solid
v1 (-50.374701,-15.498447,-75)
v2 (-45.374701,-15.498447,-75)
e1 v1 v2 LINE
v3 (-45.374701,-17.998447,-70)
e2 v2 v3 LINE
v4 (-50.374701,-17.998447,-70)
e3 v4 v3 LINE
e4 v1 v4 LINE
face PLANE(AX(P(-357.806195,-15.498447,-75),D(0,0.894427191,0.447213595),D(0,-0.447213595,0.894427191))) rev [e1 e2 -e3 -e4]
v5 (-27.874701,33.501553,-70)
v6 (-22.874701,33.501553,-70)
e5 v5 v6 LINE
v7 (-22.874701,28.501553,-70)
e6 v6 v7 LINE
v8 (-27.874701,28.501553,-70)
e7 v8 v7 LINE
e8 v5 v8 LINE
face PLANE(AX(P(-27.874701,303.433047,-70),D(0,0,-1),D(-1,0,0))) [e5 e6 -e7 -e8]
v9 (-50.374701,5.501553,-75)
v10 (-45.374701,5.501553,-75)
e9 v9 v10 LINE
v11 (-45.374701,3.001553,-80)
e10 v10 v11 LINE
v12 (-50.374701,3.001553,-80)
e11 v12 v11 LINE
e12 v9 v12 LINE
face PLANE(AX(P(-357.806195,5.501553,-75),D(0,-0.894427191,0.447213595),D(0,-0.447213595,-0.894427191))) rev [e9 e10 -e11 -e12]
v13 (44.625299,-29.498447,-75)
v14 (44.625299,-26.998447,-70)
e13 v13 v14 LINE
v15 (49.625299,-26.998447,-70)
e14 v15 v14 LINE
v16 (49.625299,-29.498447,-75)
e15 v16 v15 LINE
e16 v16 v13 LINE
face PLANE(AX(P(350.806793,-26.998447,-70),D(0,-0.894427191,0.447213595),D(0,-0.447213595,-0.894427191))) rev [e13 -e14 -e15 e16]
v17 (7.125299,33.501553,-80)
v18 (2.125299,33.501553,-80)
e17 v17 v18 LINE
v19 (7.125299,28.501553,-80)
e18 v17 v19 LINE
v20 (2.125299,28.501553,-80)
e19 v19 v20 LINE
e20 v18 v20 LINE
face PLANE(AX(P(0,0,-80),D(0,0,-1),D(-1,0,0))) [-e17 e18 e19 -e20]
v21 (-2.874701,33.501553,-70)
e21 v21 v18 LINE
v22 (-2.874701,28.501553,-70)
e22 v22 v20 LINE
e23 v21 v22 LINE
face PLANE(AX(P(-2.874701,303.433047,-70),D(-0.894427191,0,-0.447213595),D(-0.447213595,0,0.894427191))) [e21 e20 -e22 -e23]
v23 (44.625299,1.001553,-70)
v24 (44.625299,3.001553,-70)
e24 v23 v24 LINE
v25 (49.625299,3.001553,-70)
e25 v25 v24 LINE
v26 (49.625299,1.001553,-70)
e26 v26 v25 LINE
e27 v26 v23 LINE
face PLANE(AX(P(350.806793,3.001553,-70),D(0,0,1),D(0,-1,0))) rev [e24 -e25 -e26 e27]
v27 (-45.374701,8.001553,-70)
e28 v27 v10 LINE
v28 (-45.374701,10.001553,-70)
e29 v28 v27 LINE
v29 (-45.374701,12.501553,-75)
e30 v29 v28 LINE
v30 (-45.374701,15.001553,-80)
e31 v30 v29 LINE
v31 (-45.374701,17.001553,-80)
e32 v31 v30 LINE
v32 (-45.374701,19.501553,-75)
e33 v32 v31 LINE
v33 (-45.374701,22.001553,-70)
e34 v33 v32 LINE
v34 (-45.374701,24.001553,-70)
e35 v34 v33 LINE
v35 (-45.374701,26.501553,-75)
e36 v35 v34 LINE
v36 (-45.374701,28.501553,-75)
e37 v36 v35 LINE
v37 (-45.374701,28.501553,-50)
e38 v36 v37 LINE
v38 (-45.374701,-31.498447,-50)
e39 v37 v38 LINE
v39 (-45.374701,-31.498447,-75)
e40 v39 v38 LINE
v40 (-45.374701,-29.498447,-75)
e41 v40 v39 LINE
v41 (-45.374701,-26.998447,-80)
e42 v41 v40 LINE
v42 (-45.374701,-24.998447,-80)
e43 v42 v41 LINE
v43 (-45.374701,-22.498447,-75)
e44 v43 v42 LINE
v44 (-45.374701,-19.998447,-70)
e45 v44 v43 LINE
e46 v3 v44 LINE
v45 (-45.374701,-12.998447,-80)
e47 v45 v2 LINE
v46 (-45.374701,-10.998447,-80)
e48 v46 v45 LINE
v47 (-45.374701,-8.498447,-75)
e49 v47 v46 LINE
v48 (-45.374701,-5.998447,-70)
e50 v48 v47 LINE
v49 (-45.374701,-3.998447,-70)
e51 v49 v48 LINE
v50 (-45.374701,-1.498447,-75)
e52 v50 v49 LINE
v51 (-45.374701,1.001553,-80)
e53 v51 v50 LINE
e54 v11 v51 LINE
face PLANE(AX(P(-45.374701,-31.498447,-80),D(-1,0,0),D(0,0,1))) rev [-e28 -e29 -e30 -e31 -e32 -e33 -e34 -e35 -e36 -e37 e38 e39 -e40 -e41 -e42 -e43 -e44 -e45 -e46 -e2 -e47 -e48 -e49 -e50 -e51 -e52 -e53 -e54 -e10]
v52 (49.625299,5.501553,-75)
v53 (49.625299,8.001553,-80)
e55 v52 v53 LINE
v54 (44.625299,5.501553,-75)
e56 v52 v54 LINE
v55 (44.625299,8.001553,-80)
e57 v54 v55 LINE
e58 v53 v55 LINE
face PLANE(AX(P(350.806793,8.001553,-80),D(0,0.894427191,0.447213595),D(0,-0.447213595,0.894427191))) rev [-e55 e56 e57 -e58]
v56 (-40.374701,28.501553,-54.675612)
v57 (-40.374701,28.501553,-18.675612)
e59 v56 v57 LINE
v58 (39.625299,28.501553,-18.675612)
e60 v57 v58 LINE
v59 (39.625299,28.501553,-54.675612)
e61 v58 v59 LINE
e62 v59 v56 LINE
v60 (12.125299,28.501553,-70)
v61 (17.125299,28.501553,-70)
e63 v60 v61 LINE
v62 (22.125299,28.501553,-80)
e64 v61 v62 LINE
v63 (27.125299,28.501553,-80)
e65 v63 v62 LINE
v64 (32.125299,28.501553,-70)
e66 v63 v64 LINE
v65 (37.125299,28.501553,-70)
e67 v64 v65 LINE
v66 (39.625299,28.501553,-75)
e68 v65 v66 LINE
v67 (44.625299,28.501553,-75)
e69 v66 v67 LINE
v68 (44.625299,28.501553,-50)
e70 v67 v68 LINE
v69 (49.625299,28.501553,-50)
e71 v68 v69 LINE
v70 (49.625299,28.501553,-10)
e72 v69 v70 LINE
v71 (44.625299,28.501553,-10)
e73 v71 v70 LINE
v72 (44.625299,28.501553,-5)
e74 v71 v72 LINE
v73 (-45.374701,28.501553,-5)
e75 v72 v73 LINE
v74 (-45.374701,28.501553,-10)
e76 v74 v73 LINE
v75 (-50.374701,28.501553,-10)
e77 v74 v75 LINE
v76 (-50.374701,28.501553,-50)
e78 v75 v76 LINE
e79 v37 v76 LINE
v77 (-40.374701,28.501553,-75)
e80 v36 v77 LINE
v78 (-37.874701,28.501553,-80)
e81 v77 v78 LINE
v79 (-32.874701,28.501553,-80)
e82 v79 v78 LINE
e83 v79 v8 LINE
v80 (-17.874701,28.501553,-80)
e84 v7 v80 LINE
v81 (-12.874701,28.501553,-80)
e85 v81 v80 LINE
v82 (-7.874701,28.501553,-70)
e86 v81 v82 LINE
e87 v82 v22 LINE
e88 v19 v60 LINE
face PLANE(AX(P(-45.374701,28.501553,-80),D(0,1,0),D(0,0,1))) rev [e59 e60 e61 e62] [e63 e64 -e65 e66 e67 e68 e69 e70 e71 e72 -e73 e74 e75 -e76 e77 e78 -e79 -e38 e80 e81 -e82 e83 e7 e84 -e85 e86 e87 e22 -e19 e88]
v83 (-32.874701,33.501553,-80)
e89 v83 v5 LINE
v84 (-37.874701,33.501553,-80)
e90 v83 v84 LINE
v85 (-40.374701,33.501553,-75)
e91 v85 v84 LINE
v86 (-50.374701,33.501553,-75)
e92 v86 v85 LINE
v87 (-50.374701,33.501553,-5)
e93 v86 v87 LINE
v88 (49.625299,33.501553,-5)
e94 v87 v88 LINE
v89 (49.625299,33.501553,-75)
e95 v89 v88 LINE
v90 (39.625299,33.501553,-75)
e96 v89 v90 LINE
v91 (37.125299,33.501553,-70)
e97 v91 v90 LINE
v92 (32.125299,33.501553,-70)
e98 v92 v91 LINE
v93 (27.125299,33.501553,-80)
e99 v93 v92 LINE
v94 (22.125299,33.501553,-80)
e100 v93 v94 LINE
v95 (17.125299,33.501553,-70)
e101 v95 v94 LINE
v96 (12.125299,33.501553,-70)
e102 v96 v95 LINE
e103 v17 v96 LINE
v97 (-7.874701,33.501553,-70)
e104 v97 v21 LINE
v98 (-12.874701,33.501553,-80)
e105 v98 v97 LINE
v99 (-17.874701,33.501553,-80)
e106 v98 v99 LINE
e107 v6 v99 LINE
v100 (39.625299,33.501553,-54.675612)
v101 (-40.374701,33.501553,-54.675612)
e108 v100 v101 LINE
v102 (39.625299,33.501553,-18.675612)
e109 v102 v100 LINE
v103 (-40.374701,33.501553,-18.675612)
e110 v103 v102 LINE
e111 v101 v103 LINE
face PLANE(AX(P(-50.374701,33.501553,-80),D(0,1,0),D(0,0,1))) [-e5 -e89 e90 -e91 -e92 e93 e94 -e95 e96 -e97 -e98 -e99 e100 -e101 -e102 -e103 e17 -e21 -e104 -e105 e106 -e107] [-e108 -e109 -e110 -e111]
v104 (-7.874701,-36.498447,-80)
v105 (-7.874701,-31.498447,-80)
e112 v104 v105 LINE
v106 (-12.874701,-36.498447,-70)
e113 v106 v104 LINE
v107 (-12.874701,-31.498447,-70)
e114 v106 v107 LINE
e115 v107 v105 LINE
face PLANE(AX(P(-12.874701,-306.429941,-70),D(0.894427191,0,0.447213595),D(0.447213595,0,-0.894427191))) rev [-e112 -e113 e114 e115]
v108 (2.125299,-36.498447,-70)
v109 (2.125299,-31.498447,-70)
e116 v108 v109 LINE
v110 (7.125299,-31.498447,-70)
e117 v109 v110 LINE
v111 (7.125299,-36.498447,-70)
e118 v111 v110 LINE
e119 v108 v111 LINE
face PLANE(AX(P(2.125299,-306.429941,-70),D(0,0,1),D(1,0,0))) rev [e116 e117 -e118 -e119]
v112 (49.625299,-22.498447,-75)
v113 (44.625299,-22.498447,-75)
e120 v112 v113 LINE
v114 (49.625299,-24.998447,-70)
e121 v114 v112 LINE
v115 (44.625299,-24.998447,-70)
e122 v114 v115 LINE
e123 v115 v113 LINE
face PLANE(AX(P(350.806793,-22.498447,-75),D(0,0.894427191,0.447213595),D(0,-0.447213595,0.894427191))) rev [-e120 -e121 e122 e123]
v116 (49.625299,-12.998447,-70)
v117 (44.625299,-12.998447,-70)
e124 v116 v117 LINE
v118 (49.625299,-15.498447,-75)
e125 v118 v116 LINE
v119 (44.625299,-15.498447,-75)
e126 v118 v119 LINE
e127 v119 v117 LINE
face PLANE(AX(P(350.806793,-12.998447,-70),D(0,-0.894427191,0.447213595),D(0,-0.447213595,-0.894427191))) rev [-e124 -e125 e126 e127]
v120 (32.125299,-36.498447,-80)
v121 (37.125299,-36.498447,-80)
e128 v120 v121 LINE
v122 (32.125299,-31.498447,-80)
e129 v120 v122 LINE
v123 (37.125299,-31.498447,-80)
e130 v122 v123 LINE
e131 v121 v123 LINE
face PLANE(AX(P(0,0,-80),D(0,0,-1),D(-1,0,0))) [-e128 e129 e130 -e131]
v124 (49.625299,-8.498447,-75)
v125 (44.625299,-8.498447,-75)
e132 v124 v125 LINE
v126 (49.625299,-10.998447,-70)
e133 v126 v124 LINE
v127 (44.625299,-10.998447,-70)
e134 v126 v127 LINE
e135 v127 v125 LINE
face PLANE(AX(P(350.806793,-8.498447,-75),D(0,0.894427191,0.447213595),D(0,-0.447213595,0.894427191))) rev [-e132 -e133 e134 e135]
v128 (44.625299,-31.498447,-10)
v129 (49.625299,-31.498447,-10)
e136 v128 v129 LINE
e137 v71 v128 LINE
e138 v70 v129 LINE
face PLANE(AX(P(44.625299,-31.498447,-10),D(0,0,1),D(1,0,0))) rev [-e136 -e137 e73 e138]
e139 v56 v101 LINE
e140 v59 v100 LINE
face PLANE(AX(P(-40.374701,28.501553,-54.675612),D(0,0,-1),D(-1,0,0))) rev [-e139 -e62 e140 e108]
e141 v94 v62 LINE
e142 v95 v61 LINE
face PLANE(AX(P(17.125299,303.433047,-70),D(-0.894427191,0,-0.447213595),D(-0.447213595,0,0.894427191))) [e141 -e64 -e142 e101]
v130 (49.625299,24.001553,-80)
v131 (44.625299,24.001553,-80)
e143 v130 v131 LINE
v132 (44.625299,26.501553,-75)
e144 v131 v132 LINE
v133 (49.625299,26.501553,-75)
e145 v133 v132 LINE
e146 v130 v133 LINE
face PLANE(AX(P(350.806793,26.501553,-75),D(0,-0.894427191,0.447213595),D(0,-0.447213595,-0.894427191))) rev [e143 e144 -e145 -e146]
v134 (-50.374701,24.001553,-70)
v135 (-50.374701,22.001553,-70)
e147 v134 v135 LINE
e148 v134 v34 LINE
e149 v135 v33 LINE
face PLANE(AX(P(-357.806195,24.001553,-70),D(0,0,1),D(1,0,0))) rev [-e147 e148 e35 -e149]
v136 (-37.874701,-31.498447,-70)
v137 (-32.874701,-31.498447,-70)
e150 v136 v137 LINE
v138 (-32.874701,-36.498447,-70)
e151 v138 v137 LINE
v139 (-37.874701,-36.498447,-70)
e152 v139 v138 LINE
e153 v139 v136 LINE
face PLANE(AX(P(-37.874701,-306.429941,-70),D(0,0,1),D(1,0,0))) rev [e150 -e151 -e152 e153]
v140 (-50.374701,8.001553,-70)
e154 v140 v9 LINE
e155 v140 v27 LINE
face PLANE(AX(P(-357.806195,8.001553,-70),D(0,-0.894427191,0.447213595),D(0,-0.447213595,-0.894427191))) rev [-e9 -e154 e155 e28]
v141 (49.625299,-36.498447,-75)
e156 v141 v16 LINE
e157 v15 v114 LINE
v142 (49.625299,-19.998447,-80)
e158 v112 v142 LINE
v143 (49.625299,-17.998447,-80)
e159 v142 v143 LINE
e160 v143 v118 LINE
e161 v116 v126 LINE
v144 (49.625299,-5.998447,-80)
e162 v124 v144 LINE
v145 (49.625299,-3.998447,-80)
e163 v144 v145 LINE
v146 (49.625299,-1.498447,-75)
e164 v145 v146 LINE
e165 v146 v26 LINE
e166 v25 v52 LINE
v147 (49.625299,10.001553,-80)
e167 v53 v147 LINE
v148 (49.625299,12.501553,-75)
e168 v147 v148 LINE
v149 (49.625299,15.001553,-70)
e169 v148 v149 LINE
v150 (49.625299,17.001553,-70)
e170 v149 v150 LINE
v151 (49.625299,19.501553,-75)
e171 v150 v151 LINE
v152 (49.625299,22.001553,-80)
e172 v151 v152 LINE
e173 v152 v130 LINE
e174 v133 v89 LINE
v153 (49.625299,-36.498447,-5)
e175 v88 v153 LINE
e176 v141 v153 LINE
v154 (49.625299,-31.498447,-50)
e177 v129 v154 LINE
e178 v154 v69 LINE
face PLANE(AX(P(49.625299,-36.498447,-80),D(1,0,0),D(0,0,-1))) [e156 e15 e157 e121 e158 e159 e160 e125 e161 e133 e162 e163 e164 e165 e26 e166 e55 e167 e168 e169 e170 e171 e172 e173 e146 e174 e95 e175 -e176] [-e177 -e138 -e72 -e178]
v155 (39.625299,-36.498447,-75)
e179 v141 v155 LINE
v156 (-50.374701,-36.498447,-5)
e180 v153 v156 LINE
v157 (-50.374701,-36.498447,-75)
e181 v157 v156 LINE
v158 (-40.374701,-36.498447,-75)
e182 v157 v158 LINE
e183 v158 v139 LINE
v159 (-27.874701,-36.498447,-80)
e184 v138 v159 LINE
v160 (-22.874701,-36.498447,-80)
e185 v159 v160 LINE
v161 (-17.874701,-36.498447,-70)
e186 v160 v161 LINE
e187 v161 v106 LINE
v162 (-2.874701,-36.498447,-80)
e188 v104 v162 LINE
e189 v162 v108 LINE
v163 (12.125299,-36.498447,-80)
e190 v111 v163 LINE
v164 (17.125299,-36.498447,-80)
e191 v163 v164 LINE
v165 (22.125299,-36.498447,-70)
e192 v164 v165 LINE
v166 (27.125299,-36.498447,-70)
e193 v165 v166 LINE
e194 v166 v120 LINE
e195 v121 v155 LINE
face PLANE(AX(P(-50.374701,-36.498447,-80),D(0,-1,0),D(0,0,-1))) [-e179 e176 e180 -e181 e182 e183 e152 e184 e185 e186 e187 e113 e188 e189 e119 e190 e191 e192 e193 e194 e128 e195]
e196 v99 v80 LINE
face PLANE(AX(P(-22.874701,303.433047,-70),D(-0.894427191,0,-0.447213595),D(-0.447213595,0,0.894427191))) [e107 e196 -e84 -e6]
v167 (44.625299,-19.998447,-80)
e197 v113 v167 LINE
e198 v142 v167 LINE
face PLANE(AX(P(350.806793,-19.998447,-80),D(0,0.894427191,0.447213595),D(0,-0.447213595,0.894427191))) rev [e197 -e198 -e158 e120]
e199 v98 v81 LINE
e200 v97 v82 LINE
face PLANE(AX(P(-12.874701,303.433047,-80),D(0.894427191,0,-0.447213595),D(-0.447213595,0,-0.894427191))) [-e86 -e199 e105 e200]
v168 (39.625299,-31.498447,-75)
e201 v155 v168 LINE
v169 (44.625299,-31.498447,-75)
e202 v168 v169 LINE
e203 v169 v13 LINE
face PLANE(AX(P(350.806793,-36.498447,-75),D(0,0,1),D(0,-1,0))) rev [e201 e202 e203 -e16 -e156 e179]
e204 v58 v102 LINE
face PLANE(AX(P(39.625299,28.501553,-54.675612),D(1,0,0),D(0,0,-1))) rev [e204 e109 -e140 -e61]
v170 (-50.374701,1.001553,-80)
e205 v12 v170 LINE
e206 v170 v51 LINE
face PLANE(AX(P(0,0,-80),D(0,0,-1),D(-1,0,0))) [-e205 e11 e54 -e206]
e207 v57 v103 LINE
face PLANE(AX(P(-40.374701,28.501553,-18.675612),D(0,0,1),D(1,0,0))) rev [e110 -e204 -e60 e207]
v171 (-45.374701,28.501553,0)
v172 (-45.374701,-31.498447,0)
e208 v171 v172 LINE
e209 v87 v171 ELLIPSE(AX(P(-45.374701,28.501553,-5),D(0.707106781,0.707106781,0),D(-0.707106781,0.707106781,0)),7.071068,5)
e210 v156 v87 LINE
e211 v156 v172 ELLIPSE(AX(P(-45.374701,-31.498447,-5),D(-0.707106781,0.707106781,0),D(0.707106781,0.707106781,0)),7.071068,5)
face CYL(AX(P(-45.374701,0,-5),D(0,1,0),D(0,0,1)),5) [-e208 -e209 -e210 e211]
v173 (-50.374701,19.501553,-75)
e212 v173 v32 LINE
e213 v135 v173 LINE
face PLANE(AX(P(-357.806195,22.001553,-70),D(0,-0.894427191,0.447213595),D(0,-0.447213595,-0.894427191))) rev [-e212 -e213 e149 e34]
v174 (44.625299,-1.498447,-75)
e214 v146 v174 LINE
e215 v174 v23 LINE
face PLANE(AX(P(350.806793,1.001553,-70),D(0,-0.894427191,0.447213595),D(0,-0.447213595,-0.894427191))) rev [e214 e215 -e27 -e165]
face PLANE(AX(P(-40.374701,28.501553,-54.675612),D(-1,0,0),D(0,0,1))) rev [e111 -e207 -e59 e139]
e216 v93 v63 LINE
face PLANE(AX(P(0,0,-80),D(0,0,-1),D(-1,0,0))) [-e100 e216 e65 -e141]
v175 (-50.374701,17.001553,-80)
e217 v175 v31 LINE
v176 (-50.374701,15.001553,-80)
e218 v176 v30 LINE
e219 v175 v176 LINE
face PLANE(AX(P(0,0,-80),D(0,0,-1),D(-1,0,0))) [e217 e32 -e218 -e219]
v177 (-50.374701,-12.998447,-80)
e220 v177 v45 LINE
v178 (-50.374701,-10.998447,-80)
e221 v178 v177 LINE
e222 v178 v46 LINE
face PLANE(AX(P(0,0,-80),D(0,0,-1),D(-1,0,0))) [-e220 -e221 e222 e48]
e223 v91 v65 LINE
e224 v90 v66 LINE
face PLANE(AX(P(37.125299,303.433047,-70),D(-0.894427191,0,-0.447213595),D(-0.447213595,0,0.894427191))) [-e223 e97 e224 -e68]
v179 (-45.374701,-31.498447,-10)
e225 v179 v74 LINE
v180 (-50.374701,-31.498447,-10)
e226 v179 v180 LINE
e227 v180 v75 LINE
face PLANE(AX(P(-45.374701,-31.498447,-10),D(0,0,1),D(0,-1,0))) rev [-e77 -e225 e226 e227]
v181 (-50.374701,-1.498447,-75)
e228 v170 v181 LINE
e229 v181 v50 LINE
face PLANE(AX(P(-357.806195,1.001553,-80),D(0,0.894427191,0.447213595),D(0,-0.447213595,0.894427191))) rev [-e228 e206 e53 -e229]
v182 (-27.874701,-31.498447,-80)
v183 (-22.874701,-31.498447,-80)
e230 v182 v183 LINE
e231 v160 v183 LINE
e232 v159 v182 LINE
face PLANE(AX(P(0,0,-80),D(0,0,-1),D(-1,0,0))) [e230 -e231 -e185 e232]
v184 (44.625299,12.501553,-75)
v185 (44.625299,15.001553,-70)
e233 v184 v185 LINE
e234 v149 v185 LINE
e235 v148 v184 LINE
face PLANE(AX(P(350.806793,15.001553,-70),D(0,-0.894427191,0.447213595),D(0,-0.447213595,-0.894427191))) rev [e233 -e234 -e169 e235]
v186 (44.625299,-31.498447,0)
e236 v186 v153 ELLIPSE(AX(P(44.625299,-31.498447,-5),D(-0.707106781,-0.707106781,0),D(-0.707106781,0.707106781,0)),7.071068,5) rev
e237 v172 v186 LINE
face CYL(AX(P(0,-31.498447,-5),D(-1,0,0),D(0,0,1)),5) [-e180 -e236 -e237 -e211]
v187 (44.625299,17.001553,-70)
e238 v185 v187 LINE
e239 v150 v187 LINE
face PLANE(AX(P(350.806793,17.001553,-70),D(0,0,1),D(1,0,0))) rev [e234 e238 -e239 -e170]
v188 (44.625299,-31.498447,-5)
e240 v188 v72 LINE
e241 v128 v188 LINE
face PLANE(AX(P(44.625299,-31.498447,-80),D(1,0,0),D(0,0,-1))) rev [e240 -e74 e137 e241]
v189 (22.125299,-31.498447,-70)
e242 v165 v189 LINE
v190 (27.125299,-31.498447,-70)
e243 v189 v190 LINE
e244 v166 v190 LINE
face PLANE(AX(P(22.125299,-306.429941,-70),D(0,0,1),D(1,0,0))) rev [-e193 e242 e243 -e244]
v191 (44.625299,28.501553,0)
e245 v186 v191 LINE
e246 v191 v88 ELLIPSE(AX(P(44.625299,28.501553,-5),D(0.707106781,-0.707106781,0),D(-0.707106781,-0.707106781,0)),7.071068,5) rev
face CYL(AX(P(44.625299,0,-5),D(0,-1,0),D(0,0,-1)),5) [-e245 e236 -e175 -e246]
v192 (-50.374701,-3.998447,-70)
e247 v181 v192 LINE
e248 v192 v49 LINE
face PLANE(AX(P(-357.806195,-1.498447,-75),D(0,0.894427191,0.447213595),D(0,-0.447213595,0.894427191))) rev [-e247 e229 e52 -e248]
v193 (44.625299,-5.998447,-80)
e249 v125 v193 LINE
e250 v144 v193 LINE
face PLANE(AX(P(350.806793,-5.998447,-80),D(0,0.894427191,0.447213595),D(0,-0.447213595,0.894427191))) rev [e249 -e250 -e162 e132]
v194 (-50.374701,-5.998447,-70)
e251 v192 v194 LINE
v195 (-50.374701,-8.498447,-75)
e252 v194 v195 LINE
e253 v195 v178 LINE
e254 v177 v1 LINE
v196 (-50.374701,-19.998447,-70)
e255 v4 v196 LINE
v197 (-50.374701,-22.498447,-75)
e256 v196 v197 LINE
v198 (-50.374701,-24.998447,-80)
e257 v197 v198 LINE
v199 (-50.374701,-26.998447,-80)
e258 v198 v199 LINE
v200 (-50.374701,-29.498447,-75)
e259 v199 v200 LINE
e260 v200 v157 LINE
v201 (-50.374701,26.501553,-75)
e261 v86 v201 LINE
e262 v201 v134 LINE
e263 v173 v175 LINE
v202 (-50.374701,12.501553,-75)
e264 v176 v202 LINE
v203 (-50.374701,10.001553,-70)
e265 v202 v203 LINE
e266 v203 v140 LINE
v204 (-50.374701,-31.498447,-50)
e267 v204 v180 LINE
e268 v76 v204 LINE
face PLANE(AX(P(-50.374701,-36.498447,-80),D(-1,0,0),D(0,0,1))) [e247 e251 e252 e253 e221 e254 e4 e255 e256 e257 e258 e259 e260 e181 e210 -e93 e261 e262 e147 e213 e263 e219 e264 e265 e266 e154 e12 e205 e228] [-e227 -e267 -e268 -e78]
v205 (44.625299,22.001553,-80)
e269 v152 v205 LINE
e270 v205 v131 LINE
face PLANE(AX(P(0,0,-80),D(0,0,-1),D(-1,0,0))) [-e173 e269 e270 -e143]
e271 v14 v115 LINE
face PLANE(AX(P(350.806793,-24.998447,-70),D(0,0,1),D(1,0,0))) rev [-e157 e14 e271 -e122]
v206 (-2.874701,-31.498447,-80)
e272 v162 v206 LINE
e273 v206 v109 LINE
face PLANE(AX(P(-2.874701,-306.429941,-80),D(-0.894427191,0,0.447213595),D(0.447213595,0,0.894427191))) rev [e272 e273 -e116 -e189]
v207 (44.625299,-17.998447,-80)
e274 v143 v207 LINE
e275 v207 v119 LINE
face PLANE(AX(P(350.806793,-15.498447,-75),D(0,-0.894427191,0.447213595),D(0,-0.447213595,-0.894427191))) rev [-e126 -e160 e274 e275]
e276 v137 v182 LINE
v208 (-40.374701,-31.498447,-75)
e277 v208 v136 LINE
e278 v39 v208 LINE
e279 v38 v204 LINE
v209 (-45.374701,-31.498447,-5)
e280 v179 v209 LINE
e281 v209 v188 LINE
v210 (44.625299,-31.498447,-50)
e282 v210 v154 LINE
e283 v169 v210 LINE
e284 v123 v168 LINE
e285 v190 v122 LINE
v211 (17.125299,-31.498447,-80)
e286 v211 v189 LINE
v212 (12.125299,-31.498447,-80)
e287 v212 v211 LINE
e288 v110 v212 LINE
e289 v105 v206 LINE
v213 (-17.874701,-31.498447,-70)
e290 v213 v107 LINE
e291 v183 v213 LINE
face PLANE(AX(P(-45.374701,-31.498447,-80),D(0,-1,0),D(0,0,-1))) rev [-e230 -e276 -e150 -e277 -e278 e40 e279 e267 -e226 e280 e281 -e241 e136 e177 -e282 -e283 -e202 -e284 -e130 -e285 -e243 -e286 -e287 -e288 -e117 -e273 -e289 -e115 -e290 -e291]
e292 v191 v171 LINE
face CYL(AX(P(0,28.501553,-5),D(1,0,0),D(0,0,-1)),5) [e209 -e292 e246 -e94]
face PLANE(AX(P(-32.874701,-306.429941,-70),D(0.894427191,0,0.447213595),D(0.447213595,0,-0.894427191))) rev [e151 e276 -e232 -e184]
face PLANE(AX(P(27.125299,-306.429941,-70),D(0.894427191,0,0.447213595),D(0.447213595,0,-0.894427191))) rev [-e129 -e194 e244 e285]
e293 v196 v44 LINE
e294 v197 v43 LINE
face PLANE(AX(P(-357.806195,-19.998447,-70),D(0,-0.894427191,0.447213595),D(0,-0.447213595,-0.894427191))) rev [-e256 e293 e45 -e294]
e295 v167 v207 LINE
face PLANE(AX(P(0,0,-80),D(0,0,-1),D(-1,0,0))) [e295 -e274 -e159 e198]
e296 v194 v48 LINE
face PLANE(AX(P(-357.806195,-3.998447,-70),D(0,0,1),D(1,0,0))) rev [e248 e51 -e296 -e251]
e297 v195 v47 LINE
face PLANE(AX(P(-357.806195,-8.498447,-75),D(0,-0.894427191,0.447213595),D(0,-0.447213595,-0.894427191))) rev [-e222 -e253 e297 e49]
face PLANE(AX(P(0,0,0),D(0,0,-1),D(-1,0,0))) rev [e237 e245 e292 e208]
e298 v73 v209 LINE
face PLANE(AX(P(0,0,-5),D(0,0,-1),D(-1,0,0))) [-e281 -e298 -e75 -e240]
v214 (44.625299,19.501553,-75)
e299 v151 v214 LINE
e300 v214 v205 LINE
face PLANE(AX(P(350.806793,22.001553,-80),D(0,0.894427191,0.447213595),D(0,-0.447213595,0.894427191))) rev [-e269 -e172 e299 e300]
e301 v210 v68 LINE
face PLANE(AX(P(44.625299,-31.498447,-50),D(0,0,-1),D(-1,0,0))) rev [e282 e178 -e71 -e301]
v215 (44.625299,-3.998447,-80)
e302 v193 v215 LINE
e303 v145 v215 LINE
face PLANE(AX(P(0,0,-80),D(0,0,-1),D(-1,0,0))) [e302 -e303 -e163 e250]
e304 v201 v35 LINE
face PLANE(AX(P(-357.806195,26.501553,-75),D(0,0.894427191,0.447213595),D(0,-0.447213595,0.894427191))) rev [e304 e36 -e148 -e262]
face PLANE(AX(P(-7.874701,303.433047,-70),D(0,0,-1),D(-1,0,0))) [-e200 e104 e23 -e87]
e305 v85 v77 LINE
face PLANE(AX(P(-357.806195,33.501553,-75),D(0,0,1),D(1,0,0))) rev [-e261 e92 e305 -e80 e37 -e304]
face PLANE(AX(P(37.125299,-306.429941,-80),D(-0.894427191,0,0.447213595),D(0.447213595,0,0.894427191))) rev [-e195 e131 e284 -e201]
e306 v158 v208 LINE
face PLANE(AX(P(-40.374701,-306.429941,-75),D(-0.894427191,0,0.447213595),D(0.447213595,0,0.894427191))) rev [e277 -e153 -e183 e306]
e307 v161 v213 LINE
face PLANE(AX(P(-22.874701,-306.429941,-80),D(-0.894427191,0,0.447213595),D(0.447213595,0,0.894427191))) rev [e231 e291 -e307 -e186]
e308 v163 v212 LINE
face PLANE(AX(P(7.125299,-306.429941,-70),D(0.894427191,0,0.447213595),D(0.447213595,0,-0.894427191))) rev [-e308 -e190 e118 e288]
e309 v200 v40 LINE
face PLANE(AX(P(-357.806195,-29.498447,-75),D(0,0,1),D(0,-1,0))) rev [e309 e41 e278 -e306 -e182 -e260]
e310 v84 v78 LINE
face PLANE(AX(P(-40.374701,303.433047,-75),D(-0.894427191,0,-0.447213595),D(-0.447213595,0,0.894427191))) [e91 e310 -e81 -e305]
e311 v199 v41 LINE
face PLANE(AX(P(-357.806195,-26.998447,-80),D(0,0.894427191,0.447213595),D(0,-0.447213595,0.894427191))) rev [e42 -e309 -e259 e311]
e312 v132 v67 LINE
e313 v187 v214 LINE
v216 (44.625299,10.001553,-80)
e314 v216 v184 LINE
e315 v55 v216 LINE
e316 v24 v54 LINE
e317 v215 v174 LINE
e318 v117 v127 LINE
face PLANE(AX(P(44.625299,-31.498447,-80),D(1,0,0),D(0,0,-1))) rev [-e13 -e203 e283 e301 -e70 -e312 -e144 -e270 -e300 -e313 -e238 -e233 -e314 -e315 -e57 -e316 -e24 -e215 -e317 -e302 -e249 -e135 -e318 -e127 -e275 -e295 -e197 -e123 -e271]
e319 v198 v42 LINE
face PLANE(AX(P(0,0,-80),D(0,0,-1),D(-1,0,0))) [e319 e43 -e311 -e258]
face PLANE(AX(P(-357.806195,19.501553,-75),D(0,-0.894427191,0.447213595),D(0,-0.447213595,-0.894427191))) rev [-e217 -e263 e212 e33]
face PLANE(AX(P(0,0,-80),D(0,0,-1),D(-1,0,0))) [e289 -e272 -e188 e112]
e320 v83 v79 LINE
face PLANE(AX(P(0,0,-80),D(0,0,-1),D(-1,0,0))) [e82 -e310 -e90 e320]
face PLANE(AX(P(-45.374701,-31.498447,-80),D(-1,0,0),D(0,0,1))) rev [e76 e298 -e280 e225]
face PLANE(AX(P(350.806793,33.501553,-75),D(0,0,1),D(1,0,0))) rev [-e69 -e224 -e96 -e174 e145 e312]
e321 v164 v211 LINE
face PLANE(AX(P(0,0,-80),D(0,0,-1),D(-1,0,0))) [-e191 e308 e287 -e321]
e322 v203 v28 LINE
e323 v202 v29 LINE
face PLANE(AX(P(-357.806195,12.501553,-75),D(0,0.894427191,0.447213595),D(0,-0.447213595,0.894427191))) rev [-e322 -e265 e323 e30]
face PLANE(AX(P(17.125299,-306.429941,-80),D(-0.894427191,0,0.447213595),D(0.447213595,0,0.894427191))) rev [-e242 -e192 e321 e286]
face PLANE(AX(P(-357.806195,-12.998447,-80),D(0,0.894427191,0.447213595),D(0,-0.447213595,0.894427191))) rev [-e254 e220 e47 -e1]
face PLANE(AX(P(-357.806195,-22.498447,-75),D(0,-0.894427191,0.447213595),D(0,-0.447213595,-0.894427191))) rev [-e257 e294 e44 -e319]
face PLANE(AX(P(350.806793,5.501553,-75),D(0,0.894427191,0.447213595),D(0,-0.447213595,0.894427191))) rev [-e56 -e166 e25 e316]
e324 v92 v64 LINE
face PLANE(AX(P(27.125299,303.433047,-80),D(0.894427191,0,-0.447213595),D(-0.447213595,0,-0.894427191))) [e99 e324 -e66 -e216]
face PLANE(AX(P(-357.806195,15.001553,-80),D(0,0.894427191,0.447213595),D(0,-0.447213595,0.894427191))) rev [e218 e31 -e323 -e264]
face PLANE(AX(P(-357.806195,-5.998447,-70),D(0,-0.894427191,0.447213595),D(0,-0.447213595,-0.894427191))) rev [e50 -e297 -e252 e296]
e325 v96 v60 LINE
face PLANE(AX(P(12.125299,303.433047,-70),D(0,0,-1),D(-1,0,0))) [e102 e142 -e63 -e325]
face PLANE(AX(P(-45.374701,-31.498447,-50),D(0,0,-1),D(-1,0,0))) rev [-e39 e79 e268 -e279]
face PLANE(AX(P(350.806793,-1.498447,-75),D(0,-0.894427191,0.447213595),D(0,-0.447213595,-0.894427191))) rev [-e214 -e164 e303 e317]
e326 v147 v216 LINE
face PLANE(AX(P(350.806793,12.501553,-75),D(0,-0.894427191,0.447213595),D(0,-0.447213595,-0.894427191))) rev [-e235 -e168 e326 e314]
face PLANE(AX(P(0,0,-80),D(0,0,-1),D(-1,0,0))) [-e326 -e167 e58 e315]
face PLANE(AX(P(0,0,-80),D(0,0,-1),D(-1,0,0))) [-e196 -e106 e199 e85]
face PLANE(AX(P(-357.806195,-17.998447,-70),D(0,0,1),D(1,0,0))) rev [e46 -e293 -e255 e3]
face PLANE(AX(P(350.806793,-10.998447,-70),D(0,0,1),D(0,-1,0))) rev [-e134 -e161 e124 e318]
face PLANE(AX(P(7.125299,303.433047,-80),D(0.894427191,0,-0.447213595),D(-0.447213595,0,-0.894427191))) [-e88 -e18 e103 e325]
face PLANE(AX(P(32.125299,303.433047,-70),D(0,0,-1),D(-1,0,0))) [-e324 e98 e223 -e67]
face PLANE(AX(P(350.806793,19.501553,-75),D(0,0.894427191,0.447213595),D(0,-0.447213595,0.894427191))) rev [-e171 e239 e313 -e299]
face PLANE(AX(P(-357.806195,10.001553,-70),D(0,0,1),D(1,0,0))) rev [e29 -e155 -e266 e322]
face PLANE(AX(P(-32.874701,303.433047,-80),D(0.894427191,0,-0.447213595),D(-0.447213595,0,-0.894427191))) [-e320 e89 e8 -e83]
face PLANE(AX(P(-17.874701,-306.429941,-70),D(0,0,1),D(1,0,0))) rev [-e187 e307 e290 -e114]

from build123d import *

# Parameters (mm, degrees)
SKETCH1_W               = 100
SKETCH1_H               = 70
BOSS_EXTRUDE1_DEPTH     = 80
FILLET2_R               = 5
CUT_EXTRUDE1_START      = -5
SKETCH3_W               = 90
SKETCH3_H               = 60
CUT_EXTRUDE1_DEPTH      = 75
SKETCH2_W               = 40
SKETCH2_H               = 60
CUT_EXTRUDE2_DEPTH      = 5
SKETCH4_W               = 40
SKETCH4_H               = 60
CUT_EXTRUDE3_DEPTH      = 5
CUT_EXTRUDE4_START      = -5
CUT_EXTRUDE4_DEPTH      = 5
CUT_EXTRUDE5_START      = -5
CUT_EXTRUDE5_DEPTH      = 5
CUT_EXTRUDE6_DEPTH      = 118.633373344
CUT_EXTRUDE6_DEPTH_BACK = 5
CUT_EXTRUDE7_DEPTH      = 118.633373344
CUT_EXTRUDE7_DEPTH_BACK = 5
SKETCH9_W               = 80
SKETCH9_H               = 36
CUT_EXTRUDE8_DEPTH      = 5


# Read off the part's stored shape, not the designer's step: Cut-Extrude4, Cut-Extrude5
with BuildPart() as part:
    # Sketch1 → Boss-Extrude1 (new body)
    with BuildSketch(Plane.XY):
        with Locations((-0.374701232, -1.49844749)):
            Rectangle(SKETCH1_W, SKETCH1_H)
    extrude(amount=-BOSS_EXTRUDE1_DEPTH)

    # Fillet2
    fillet2_edges = [part.edges().sort_by_distance(p)[0] for p in [
        (-0.374701232, 33.50155251, 0),
        (49.625298768, -1.49844749, 0),
        (-0.374701232, -36.49844749, 0),
        (-50.374701232, -1.49844749, 0),
    ]]
    fillet(fillet2_edges, radius=FILLET2_R)

    # Sketch3 → Cut-Extrude1 (cut)
    with BuildSketch(Plane.XY.offset(CUT_EXTRUDE1_START)):
        with Locations((-0.374701232, -1.49844749)):
            Rectangle(SKETCH3_W, SKETCH3_H)
    extrude(amount=-CUT_EXTRUDE1_DEPTH, mode=Mode.SUBTRACT)

    # Sketch2 → Cut-Extrude2 (cut)
    with BuildSketch(Plane(origin=(49.625298768, 0, 0), x_dir=(0, 0, -1), z_dir=(1, 0, 0))):
        with Locations((30, -1.49844749)):
            Rectangle(SKETCH2_W, SKETCH2_H)
    extrude(amount=-CUT_EXTRUDE2_DEPTH, mode=Mode.SUBTRACT)

    # Sketch4 → Cut-Extrude3 (cut)
    with BuildSketch(Plane.ZY.offset(50.374701232)):
        with Locations((-30, -1.49844749)):
            Rectangle(SKETCH4_W, SKETCH4_H)
    extrude(amount=-CUT_EXTRUDE3_DEPTH, mode=Mode.SUBTRACT)

    # Cut-Extrude4 outline → Cut-Extrude4 (cut)
    with BuildSketch(Plane(origin=(49.625298768, 0, 0), x_dir=(0, 0, -1), z_dir=(1, 0, 0)).offset(CUT_EXTRUDE4_START)):
        Polygon((80, -19.99844749), (70, -24.99844749), (70, -26.99844749), (75, -29.49844749), (75, -36.49844749), (80, -36.49844749), align=None)
        Polygon((75, 26.50155251), (80, 24.00155251), (80, 33.50155251), (75, 33.50155251), align=None)
        Polygon((70, 15.00155251), (80, 10.00155251), (80, 22.00155251), (70, 17.00155251), align=None)
        Polygon((70, 1.00155251), (80, -3.99844749), (80, 8.00155251), (70, 3.00155251), align=None)
        Polygon((70, -12.99844749), (80, -17.99844749), (80, -5.99844749), (70, -10.99844749), align=None)
    extrude(amount=CUT_EXTRUDE4_DEPTH, mode=Mode.SUBTRACT)

    # Cut-Extrude5 outline → Cut-Extrude5 (cut)
    with BuildSketch(Plane.ZY.offset(50.374701232).offset(CUT_EXTRUDE5_START)):
        Polygon((-80, 17.00155251), (-70, 22.00155251), (-70, 24.00155251), (-75, 26.50155251), (-75, 33.50155251), (-80, 33.50155251), align=None)
        Polygon((-75, -29.49844749), (-80, -26.99844749), (-80, -36.49844749), (-75, -36.49844749), align=None)
        Polygon((-70, -17.99844749), (-80, -12.99844749), (-80, -24.99844749), (-70, -19.99844749), align=None)
        Polygon((-70, -3.99844749), (-80, 1.00155251), (-80, -10.99844749), (-70, -5.99844749), align=None)
        Polygon((-70, 10.00155251), (-80, 15.00155251), (-80, 3.00155251), (-70, 8.00155251), align=None)
    extrude(amount=CUT_EXTRUDE5_DEPTH, mode=Mode.SUBTRACT)

    # Sketch7 → Cut-Extrude6 (cut, two sides: drawn at the far end of the back side and taken through both)
    with BuildSketch(Plane(origin=(0, 33.50155251, 0), x_dir=(1, 0, 0), z_dir=(0, 1, 0)).offset(-CUT_EXTRUDE6_DEPTH_BACK)):
        Polygon((-297.449069971, 75), (-45.374701232, 75), (-40.374701232, 75), (-37.874701232, 80), (-32.874701232, 80), (-27.874701232, 70), (-22.874701232, 70), (-17.874701232, 80), (-12.874701232, 80), (-7.874701232, 70), (-2.874701232, 70), (2.125298768, 80), (7.125298768, 80), (12.125298768, 70), (17.125298768, 70), (22.125298768, 80), (27.125298768, 80), (32.125298768, 70), (37.125298768, 70), (39.625298768, 75), (44.625298768, 75), (296.699667506, 75), (296.699667506, 579.148737476), (-297.449069971, 579.148737476), align=None)
    extrude(amount=CUT_EXTRUDE6_DEPTH + CUT_EXTRUDE6_DEPTH_BACK, mode=Mode.SUBTRACT)

    # Sketch8 → Cut-Extrude7 (cut, two sides: drawn at the far end of the back side and taken through both)
    with BuildSketch(Plane.XZ.offset(36.49844749).offset(-CUT_EXTRUDE7_DEPTH_BACK)):
        Polygon((-297.449069971, -75), (-45.374701232, -75), (-40.374701232, -75), (-37.874701232, -70), (-32.874701232, -70), (-27.874701232, -80), (-22.874701232, -80), (-17.874701232, -70), (-12.874701232, -70), (-7.874701232, -80), (-2.874701232, -80), (2.125298768, -70), (7.125298768, -70), (12.125298768, -80), (17.125298768, -80), (22.125298768, -70), (27.125298768, -70), (32.125298768, -80), (37.125298768, -80), (39.625298768, -75), (44.625298768, -75), (296.699667506, -75), (296.699667506, -579.148737476), (-297.449069971, -579.148737476), align=None)
    extrude(amount=CUT_EXTRUDE7_DEPTH + CUT_EXTRUDE7_DEPTH_BACK, mode=Mode.SUBTRACT)

    # Sketch9 → Cut-Extrude8 (cut)
    with BuildSketch(Plane(origin=(0, 33.50155251, 0), x_dir=(1, 0, 0), z_dir=(0, 1, 0))):
        with Locations((-0.374701232, 36.675611874)):
            Rectangle(SKETCH9_W, SKETCH9_H)
    extrude(amount=-CUT_EXTRUDE8_DEPTH, mode=Mode.SUBTRACT)


solid = part.part
